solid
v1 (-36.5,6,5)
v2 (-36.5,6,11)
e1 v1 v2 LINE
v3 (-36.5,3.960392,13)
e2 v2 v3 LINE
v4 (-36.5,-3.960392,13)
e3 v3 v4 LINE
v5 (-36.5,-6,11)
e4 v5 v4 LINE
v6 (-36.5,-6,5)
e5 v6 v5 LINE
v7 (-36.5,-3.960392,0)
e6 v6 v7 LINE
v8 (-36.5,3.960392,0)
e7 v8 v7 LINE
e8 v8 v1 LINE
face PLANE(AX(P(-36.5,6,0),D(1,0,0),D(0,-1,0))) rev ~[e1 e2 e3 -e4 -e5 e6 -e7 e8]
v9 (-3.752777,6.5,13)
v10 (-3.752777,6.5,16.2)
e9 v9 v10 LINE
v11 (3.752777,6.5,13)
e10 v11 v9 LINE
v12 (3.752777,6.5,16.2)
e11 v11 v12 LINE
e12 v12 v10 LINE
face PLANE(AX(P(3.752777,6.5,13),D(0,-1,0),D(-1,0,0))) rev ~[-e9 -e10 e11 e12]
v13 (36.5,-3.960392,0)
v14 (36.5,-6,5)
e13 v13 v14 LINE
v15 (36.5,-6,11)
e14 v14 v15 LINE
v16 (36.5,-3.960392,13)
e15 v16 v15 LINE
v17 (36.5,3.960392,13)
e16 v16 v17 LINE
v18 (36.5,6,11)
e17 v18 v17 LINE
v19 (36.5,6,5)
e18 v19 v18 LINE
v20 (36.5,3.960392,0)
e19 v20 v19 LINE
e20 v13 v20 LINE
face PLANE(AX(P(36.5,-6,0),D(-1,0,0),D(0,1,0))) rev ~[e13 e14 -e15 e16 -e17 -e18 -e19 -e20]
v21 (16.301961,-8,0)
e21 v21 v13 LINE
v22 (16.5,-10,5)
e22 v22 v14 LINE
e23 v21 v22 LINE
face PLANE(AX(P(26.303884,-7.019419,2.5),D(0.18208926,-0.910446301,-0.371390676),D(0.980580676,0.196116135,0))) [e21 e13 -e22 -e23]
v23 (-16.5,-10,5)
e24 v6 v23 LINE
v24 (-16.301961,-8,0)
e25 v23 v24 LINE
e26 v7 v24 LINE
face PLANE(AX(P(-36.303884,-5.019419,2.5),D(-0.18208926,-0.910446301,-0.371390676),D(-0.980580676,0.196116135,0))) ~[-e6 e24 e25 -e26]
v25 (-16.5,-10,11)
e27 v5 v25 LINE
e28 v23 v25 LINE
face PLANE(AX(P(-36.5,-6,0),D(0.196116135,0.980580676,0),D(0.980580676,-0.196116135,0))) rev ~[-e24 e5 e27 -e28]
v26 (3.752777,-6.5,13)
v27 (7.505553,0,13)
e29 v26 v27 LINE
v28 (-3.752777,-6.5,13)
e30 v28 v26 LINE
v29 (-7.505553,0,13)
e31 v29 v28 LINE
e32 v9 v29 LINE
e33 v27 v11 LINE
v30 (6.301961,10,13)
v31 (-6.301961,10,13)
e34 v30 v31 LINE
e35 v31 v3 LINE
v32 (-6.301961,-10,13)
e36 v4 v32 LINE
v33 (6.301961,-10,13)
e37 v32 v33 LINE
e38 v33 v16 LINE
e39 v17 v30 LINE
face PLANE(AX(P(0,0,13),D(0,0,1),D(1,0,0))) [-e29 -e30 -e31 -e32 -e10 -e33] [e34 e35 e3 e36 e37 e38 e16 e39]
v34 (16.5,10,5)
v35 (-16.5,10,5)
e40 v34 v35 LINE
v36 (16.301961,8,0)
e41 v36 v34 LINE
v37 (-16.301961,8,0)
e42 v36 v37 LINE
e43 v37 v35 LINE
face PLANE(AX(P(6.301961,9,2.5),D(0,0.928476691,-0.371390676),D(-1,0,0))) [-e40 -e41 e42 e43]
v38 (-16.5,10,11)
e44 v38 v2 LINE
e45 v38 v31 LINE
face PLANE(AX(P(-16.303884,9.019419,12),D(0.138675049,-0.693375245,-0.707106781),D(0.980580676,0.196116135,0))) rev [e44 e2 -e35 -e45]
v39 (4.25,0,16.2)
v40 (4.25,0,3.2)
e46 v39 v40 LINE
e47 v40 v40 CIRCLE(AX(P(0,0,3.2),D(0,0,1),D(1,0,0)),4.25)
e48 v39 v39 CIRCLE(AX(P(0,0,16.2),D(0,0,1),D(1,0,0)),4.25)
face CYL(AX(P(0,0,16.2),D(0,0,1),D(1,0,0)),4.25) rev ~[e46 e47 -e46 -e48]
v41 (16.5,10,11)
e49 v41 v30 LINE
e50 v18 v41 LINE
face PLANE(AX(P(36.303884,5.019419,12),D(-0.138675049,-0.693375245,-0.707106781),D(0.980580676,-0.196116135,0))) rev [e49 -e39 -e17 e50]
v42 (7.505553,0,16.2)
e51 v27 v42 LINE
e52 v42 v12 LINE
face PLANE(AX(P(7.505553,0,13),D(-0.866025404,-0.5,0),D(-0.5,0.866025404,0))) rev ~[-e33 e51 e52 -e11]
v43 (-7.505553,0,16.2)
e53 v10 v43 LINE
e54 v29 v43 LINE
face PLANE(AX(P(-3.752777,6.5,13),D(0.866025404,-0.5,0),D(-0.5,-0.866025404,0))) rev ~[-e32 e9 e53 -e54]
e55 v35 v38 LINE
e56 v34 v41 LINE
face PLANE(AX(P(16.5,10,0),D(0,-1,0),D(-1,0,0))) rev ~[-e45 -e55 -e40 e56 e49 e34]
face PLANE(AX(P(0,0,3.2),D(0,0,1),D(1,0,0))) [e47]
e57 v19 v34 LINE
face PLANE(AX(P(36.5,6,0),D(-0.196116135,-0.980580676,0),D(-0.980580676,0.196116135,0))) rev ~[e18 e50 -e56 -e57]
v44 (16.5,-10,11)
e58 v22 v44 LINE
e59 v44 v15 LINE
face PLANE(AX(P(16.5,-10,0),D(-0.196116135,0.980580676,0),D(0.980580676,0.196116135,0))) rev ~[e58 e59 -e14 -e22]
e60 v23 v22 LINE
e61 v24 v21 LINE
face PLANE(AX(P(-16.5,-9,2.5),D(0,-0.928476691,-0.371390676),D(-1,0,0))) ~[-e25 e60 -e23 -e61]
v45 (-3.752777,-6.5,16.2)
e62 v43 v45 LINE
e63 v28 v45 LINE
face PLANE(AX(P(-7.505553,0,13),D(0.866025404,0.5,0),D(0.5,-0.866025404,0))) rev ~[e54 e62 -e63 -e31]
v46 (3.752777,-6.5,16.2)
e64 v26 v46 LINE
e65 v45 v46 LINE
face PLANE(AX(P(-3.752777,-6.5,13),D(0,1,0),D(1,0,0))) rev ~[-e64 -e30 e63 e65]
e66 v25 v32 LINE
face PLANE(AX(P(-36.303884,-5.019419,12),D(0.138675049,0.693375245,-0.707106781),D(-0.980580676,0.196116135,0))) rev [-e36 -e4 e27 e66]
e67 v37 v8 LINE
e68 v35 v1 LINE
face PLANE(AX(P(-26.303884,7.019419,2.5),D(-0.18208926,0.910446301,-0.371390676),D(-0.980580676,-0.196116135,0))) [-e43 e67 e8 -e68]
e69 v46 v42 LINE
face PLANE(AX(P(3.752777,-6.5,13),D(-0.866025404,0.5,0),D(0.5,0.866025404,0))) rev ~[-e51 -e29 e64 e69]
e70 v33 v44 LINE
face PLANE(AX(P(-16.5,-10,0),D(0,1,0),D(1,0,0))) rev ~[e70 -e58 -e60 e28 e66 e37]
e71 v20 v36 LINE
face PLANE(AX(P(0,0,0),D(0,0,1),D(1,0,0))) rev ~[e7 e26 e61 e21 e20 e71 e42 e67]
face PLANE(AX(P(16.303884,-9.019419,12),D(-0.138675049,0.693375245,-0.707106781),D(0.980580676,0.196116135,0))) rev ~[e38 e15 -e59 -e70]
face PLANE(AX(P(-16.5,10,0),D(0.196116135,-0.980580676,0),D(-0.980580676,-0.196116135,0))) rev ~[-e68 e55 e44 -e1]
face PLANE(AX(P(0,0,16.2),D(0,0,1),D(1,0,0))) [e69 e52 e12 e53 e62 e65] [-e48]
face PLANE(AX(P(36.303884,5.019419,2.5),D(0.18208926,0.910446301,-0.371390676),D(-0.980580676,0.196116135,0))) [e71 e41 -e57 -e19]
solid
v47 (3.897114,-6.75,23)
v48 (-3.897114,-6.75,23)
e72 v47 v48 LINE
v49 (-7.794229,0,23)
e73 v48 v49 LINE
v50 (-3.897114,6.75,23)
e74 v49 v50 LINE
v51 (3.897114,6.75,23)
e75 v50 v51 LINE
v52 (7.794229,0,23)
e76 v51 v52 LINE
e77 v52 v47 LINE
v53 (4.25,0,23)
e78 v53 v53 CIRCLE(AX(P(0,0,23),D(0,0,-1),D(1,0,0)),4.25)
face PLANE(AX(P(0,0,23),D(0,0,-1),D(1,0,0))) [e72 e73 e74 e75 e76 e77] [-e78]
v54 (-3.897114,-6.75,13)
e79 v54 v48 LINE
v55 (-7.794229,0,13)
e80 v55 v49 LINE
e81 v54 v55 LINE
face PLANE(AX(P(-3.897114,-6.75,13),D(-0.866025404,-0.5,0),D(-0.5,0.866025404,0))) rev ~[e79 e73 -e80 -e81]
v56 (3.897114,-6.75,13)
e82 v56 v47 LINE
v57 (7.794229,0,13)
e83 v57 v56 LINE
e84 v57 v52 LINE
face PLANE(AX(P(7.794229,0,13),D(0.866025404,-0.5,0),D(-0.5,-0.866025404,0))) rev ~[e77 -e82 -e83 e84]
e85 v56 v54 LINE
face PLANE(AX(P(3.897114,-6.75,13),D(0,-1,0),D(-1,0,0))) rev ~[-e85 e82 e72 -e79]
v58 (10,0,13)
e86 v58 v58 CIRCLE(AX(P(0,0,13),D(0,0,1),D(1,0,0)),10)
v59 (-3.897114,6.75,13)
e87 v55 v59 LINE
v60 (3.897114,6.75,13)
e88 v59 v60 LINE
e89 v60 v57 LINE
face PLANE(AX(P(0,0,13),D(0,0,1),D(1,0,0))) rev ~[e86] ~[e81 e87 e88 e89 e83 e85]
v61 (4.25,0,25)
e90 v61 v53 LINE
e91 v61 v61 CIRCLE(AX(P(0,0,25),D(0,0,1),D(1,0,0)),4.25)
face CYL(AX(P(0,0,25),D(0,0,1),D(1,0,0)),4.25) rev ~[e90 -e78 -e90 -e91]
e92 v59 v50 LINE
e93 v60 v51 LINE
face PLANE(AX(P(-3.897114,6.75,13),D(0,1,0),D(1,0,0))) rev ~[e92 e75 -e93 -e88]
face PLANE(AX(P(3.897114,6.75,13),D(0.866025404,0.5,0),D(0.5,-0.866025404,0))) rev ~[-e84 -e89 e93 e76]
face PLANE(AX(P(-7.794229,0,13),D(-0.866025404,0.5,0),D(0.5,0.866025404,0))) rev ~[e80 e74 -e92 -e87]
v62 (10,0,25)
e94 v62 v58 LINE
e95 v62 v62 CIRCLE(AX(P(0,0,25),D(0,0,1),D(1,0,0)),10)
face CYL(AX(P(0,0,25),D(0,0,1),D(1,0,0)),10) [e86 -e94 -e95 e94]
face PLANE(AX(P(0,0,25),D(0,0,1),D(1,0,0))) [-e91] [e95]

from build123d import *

# Parameters (mm, degrees)
F1_DEPTH    = 13
F3_DEPTH    = 3.2
F4_R        = 4.25
F5_DEPTH    = 13
F6_C1_SIZE2 = 2
F6_C1_SIZE  = 5
F6_C2_SIZE2 = 2
F6_C2_SIZE  = 5
F6_C3_SIZE2 = 5
F6_C3_SIZE  = 2
F6_C4_SIZE2 = 5
F6_C4_SIZE  = 2
F6_C5_SIZE2 = 5
F6_C5_SIZE  = 2
F6_C6_SIZE2 = 5
F6_C6_SIZE  = 2
F7_SIZE     = 2
F9_R        = 10
F9_R_2      = 4.25
F10_DEPTH   = 12
F11_R       = 4.25
F12_DEPTH   = 10


with BuildPart() as f1:
    # F0 (on Top) → F1 (new body)
    with BuildSketch(Plane.XY):
        Polygon((-16.5, -10), (16.5, -10), (36.5, -6), (36.5, 6), (16.5, 10), (-16.5, 10), (-36.5, 6), (-36.5, -6), align=None)
    extrude(amount=F1_DEPTH)

    # F2 (on face) → F3 (join)
    with BuildSketch(Plane.XY.offset(13)):
        Polygon((-3.7527767497, -6.5), (3.7527767497, -6.5), (7.5055534995, 0), (3.7527767497, 6.5), (-3.7527767497, 6.5), (-7.5055534995, 0), align=None)
    extrude(amount=F3_DEPTH)

    # F4 (on face) → F5 (cut)
    with BuildSketch(Plane.XY.offset(16.2)):
        Circle(F4_R)
    extrude(amount=-F5_DEPTH, mode=Mode.SUBTRACT)

    # F6: chamfer of 5 x 2 on 6 edges, made by hand

    # F6_c1
    f6_c1_edges = [f1.edges().sort_by_distance(p)[0] for p in [
        (0, -10, 0),
    ]]
    f6_c1_side = f1.faces().sort_by_distance((0, -10, 0.04))[0]
    chamfer(f6_c1_edges, length=F6_C1_SIZE, length2=F6_C1_SIZE2, reference=f6_c1_side)

    # F6_c2
    f6_c2_edges = [f1.edges().sort_by_distance(p)[0] for p in [
        (-31.5, -7, 0),
    ]]
    f6_c2_side = f1.faces().sort_by_distance((-31.5, -7, 0.04))[0]
    chamfer(f6_c2_edges, length=F6_C2_SIZE, length2=F6_C2_SIZE2, reference=f6_c2_side)

    # F6_c3
    f6_c3_edges = [f1.edges().sort_by_distance(p)[0] for p in [
        (31.5, -7, 0),
    ]]
    f6_c3_side = f1.faces().sort_by_distance((31.4921553546, -6.960776773, 0))[0]
    chamfer(f6_c3_edges, length=F6_C3_SIZE, length2=F6_C3_SIZE2, reference=f6_c3_side)

    # F6_c4
    f6_c4_edges = [f1.edges().sort_by_distance(p)[0] for p in [
        (26.5, 8, 0),
    ]]
    f6_c4_side = f1.faces().sort_by_distance((26.4921553546, 7.960776773, 0))[0]
    chamfer(f6_c4_edges, length=F6_C4_SIZE, length2=F6_C4_SIZE2, reference=f6_c4_side)

    # F6_c5
    f6_c5_edges = [f1.edges().sort_by_distance(p)[0] for p in [
        (-5.0990195136, 10, 0),
    ]]
    f6_c5_side = f1.faces().sort_by_distance((-5.0990195136, 9.96, 0))[0]
    chamfer(f6_c5_edges, length=F6_C5_SIZE, length2=F6_C5_SIZE2, reference=f6_c5_side)

    # F6_c6
    f6_c6_edges = [f1.edges().sort_by_distance(p)[0] for p in [
        (-31.5, 7, 0),
    ]]
    f6_c6_side = f1.faces().sort_by_distance((-31.4921553546, 6.960776773, 0))[0]
    chamfer(f6_c6_edges, length=F6_C6_SIZE, length2=F6_C6_SIZE2, reference=f6_c6_side)

    # F7
    f7_edges = [f1.edges().sort_by_distance(p)[0] for p in [
        (26.5, -8, 13),
        (26.5, 8, 13),
        (-26.5, 8, 13),
        (-26.5, -8, 13),
    ]]
    chamfer(f7_edges, length=F7_SIZE)


with BuildPart() as f10:
    # F9 (on offset) → F10 (new body)
    with BuildSketch(Plane.XY.offset(25)):
        Circle(F9_R)
        Circle(F9_R_2, mode=Mode.SUBTRACT)
    extrude(amount=-F10_DEPTH)

    # F11 (on face) → F12 (cut)
    with BuildSketch(Plane(origin=(0, 0, 13), x_dir=(1, 0, 0), z_dir=(0, 0, -1))):
        Polygon((-3.897114317, -6.75), (3.897114317, -6.75), (7.7942286341, 0), (3.897114317, 6.75), (-3.897114317, 6.75), (-7.7942286341, 0), align=None)
        Circle(F11_R, mode=Mode.SUBTRACT)
    extrude(amount=-F12_DEPTH, mode=Mode.SUBTRACT)


solid = Compound([f1.part, f10.part])
